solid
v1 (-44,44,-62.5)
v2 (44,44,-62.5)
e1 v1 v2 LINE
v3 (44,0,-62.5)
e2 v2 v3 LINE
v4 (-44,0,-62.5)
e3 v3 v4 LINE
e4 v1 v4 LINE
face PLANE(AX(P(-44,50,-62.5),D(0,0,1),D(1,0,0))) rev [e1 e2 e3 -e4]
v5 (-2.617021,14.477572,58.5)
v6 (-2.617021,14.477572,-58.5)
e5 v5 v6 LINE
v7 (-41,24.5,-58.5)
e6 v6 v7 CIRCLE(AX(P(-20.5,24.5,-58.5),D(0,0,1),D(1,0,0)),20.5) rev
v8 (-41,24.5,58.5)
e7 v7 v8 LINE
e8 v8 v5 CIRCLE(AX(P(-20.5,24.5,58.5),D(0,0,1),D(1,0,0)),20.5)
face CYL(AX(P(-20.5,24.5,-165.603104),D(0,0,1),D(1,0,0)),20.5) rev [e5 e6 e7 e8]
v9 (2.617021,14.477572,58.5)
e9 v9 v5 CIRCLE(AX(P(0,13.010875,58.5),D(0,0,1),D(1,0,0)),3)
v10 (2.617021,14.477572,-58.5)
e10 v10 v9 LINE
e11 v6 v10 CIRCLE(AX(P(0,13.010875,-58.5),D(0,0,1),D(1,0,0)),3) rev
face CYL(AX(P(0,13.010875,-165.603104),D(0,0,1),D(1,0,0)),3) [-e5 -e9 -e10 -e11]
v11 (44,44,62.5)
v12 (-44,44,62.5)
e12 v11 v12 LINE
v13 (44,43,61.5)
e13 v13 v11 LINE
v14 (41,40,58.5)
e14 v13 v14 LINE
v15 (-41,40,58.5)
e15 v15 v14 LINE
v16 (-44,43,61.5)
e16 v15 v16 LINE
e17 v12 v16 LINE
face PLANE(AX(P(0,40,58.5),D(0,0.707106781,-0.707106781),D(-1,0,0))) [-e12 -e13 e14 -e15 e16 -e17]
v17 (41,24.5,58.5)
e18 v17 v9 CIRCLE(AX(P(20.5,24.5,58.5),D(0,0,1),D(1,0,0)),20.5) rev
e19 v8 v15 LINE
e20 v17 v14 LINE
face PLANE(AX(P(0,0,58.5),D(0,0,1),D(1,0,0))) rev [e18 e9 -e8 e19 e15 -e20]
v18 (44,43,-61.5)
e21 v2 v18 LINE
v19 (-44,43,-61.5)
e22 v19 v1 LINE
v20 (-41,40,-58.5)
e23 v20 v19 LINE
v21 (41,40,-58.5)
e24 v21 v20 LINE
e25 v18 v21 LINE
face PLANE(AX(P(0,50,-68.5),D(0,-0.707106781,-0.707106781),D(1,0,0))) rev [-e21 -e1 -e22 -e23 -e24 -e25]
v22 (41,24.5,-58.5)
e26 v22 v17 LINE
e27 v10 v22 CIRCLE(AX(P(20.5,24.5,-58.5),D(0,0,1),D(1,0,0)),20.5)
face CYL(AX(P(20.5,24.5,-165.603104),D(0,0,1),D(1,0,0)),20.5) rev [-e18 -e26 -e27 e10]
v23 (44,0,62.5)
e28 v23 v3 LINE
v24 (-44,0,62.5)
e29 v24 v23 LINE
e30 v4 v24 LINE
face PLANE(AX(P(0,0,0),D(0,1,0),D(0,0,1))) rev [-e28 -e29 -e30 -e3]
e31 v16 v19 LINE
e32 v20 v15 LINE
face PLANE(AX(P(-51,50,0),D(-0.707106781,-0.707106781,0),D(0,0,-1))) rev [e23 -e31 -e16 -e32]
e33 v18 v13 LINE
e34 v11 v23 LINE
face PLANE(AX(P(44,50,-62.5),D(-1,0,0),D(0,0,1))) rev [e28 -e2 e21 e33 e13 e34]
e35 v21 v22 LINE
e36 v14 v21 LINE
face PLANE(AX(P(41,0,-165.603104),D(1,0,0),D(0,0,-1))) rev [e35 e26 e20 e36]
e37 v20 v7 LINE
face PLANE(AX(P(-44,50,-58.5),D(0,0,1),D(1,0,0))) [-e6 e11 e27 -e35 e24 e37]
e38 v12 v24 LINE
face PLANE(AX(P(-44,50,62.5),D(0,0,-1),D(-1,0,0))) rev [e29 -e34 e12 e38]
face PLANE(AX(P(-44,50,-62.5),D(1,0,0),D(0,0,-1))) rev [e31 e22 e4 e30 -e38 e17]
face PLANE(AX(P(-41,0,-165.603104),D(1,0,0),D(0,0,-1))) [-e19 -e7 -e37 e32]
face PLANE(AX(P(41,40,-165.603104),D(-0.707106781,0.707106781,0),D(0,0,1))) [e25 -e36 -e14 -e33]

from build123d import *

# Parameters (mm, degrees)
SKETCH1_W           = 88
SKETCH1_H           = 125
BOSS_EXTRUDE1_DEPTH = 50
CUT_EXTRUDE1_DEPTH  = 117
FILLET1_R           = 3


with BuildPart() as part:
    # Sketch1 → Boss-Extrude1 (new body)
    with BuildSketch(Plane(origin=(0, 0, 0), x_dir=(1, 0, 0), z_dir=(0, 1, 0))):
        Rectangle(SKETCH1_W, SKETCH1_H)
    extrude(amount=BOSS_EXTRUDE1_DEPTH)

    # Sketch2 → Cut-Extrude1 (cut)
    with BuildSketch(Plane.XY.offset(58.5)):
        with BuildLine():
            Line((-41, 24.5), (-41, 66.5))
            Line((-41, 66.5), (41, 66.5))
            Line((41, 66.5), (41, 24.5))
            ThreePointArc((41, 24.5), (20.5, 4), (0, 24.5))
            ThreePointArc((0, 24.5), (-20.5, 4), (-41, 24.5))
        make_face()
    extrude(amount=-CUT_EXTRUDE1_DEPTH, mode=Mode.SUBTRACT)

    # Fillet1
    fillet1_edges = [part.edges().sort_by_distance(p)[0] for p in [
        (0, 24.5, 0),
    ]]
    fillet(fillet1_edges, radius=FILLET1_R)

    # Chamfer1
    # the kernel refuses this chamfer: 10 mm, written as the material it takes off along each edge
    with BuildSketch(Plane(origin=(-41, 50, 58.5), x_dir=(0, 0.027495876610586337, 0.9996219169112968), z_dir=(1, 0, 0)), Plane(origin=(-41, 50, -58.5), x_dir=(0, -0.9996219169112968, 0.027495876610586317), z_dir=(1, 0, 0))) as chamfer1_piece_1:
        with BuildLine():
            Line((10.286731952, 0), (-0.565471549, 10.271177935))
            Line((-0.565471549, 10.271177935), (-0.765395932, 10.26567876))
            ThreePointArc((-0.765395932, 10.26567876), (-0.341292271, 5.133978296), (-0.199924383, -0.005499175))
            Line((-0.199924383, -0.005499175), (0.005499175, -0.199924383))
            ThreePointArc((0.005499175, -0.199924383), (5.144976647, -0.058556496), (10.292231127, -0.199924383))
            Line((10.292231127, -0.199924383), (10.286731952, 0))
        make_face()
    extrude(amount=82, mode=Mode.SUBTRACT)
    with BuildSketch(Plane(origin=(41, 50, 58.5), x_dir=(0.9996219169112968, 0.027495876610586317, 0), z_dir=(0, 0, -1))) as chamfer1_piece_2:
        with BuildLine():
            Line((10.286731952, 0), (-0.565471549, 10.271177935))
            Line((-0.565471549, 10.271177935), (-0.765395932, 10.26567876))
            ThreePointArc((-0.765395932, 10.26567876), (-0.341292271, 5.133978296), (-0.199924383, -0.005499175))
            Line((-0.199924383, -0.005499175), (0.005499175, -0.199924383))
            ThreePointArc((0.005499175, -0.199924383), (5.144976647, -0.058556496), (10.292231127, -0.199924383))
            Line((10.292231127, -0.199924383), (10.286731952, 0))
        make_face()
    extrude(amount=117, mode=Mode.SUBTRACT)
    with BuildSketch(Plane(origin=(-41, 50, -58.5), x_dir=(0.027495876610586317, -0.9996219169112968, 0), z_dir=(0, 0, 1))) as chamfer1_piece_3:
        with BuildLine():
            Line((10.286731952, 0), (-0.565471549, -10.271177935))
            Line((-0.565471549, -10.271177935), (-0.765395932, -10.26567876))
            ThreePointArc((-0.765395932, -10.26567876), (-0.341292271, -5.133978296), (-0.199924383, 0.005499175))
            Line((-0.199924383, 0.005499175), (0.005499175, 0.199924383))
            ThreePointArc((0.005499175, 0.199924383), (5.144976647, 0.058556496), (10.292231127, 0.199924383))
            Line((10.292231127, 0.199924383), (10.286731952, 0))
        make_face()
    extrude(amount=117, mode=Mode.SUBTRACT)
    with BuildSketch(Plane(origin=(-41, 50, -58.5), x_dir=(0.027495876610586317, -0.9996219169112968, 0), z_dir=(0, 0, 1))) as chamfer1_piece_4a_section:
        with BuildLine():
            Line((10.286731952, 0), (-0.565471549, -10.271177935))
            Line((-0.565471549, -10.271177935), (-0.765395932, -10.26567876))
            ThreePointArc((-0.765395932, -10.26567876), (-0.341292271, -5.133978296), (-0.199924383, 0.005499175))
            Line((-0.199924383, 0.005499175), (0.005499175, 0.199924383))
            ThreePointArc((0.005499175, 0.199924383), (5.144976647, 0.058556496), (10.292231127, 0.199924383))
            Line((10.292231127, 0.199924383), (10.286731952, 0))
        make_face()
    chamfer1_piece_4a = extrude(amount=142.71682988, mode=Mode.PRIVATE)
    chamfer1_piece_4a = split(chamfer1_piece_4a, bisect_by=Plane(origin=(-44.297936268, 46.702063732, 58.5), z_dir=(0, 0, 1)), keep=Keep.TOP, mode=Mode.PRIVATE)
    with BuildSketch(Plane(origin=(-66.71682988, 50, 58.5), x_dir=(0, 0.027495876610586337, 0.9996219169112968), z_dir=(1, 0, 0))) as chamfer1_piece_4b_section:
        with BuildLine():
            Line((10.286731952, 0), (-0.565471549, 10.271177935))
            Line((-0.565471549, 10.271177935), (-0.765395932, 10.26567876))
            ThreePointArc((-0.765395932, 10.26567876), (-0.341292271, 5.133978296), (-0.199924383, -0.005499175))
            Line((-0.199924383, -0.005499175), (0.005499175, -0.199924383))
            ThreePointArc((0.005499175, -0.199924383), (5.144976647, -0.058556496), (10.292231127, -0.199924383))
            Line((10.292231127, -0.199924383), (10.286731952, 0))
        make_face()
    chamfer1_piece_4b = extrude(amount=107.71682988, mode=Mode.PRIVATE)
    chamfer1_piece_4b = split(chamfer1_piece_4b, bisect_by=Plane(origin=(-41, 46.702063732, 61.797936268), z_dir=(-1, 0, 0)), keep=Keep.TOP, mode=Mode.PRIVATE)
    chamfer1_piece_4 = chamfer1_piece_4a & chamfer1_piece_4b
    add(chamfer1_piece_4, mode=Mode.SUBTRACT)
    with BuildSketch(Plane(origin=(41, 50, 84.21682988), x_dir=(0.9996219169112968, 0.027495876610586317, 0), z_dir=(0, 0, -1))) as chamfer1_piece_5a_section:
        with BuildLine():
            Line((10.286731952, 0), (-0.565471549, 10.271177935))
            Line((-0.565471549, 10.271177935), (-0.765395932, 10.26567876))
            ThreePointArc((-0.765395932, 10.26567876), (-0.341292271, 5.133978296), (-0.199924383, -0.005499175))
            Line((-0.199924383, -0.005499175), (0.005499175, -0.199924383))
            ThreePointArc((0.005499175, -0.199924383), (5.144976647, -0.058556496), (10.292231127, -0.199924383))
            Line((10.292231127, -0.199924383), (10.286731952, 0))
        make_face()
    chamfer1_piece_5a = extrude(amount=142.71682988, mode=Mode.PRIVATE)
    chamfer1_piece_5a = split(chamfer1_piece_5a, bisect_by=Plane(origin=(44.297936268, 46.702063732, 58.5), z_dir=(0, 0, 1)), keep=Keep.TOP, mode=Mode.PRIVATE)
    with BuildSketch(Plane(origin=(-41, 50, 58.5), x_dir=(0, 0.027495876610586337, 0.9996219169112968), z_dir=(1, 0, 0))) as chamfer1_piece_5b_section:
        with BuildLine():
            Line((10.286731952, 0), (-0.565471549, 10.271177935))
            Line((-0.565471549, 10.271177935), (-0.765395932, 10.26567876))
            ThreePointArc((-0.765395932, 10.26567876), (-0.341292271, 5.133978296), (-0.199924383, -0.005499175))
            Line((-0.199924383, -0.005499175), (0.005499175, -0.199924383))
            ThreePointArc((0.005499175, -0.199924383), (5.144976647, -0.058556496), (10.292231127, -0.199924383))
            Line((10.292231127, -0.199924383), (10.286731952, 0))
        make_face()
    chamfer1_piece_5b = extrude(amount=107.71682988, mode=Mode.PRIVATE)
    chamfer1_piece_5b = split(chamfer1_piece_5b, bisect_by=Plane(origin=(41, 46.702063732, 61.797936268), z_dir=(1, 0, 0)), keep=Keep.TOP, mode=Mode.PRIVATE)
    chamfer1_piece_5 = chamfer1_piece_5a & chamfer1_piece_5b
    add(chamfer1_piece_5, mode=Mode.SUBTRACT)
    with BuildSketch(Plane(origin=(-41, 50, -58.5), x_dir=(0, -0.9996219169112968, 0.027495876610586317), z_dir=(1, 0, 0))) as chamfer1_piece_6a_section:
        with BuildLine():
            Line((10.286731952, 0), (-0.565471549, 10.271177935))
            Line((-0.565471549, 10.271177935), (-0.765395932, 10.26567876))
            ThreePointArc((-0.765395932, 10.26567876), (-0.341292271, 5.133978296), (-0.199924383, -0.005499175))
            Line((-0.199924383, -0.005499175), (0.005499175, -0.199924383))
            ThreePointArc((0.005499175, -0.199924383), (5.144976647, -0.058556496), (10.292231127, -0.199924383))
            Line((10.292231127, -0.199924383), (10.286731952, 0))
        make_face()
    chamfer1_piece_6a = extrude(amount=107.71682988, mode=Mode.PRIVATE)
    chamfer1_piece_6a = split(chamfer1_piece_6a, bisect_by=Plane(origin=(41, 46.702063732, -61.797936268), z_dir=(1, 0, 0)), keep=Keep.TOP, mode=Mode.PRIVATE)
    with BuildSketch(Plane(origin=(41, 50, 58.5), x_dir=(0.9996219169112968, 0.027495876610586317, 0), z_dir=(0, 0, -1))) as chamfer1_piece_6b_section:
        with BuildLine():
            Line((10.286731952, 0), (-0.565471549, 10.271177935))
            Line((-0.565471549, 10.271177935), (-0.765395932, 10.26567876))
            ThreePointArc((-0.765395932, 10.26567876), (-0.341292271, 5.133978296), (-0.199924383, -0.005499175))
            Line((-0.199924383, -0.005499175), (0.005499175, -0.199924383))
            ThreePointArc((0.005499175, -0.199924383), (5.144976647, -0.058556496), (10.292231127, -0.199924383))
            Line((10.292231127, -0.199924383), (10.286731952, 0))
        make_face()
    chamfer1_piece_6b = extrude(amount=142.71682988, mode=Mode.PRIVATE)
    chamfer1_piece_6b = split(chamfer1_piece_6b, bisect_by=Plane(origin=(44.297936268, 46.702063732, -58.5), z_dir=(0, 0, -1)), keep=Keep.TOP, mode=Mode.PRIVATE)
    chamfer1_piece_6 = chamfer1_piece_6a & chamfer1_piece_6b
    add(chamfer1_piece_6, mode=Mode.SUBTRACT)
    with BuildSketch(Plane(origin=(-66.71682988, 50, -58.5), x_dir=(0, -0.9996219169112968, 0.027495876610586317), z_dir=(1, 0, 0))) as chamfer1_piece_7a_section:
        with BuildLine():
            Line((10.286731952, 0), (-0.565471549, 10.271177935))
            Line((-0.565471549, 10.271177935), (-0.765395932, 10.26567876))
            ThreePointArc((-0.765395932, 10.26567876), (-0.341292271, 5.133978296), (-0.199924383, -0.005499175))
            Line((-0.199924383, -0.005499175), (0.005499175, -0.199924383))
            ThreePointArc((0.005499175, -0.199924383), (5.144976647, -0.058556496), (10.292231127, -0.199924383))
            Line((10.292231127, -0.199924383), (10.286731952, 0))
        make_face()
    chamfer1_piece_7a = extrude(amount=107.71682988, mode=Mode.PRIVATE)
    chamfer1_piece_7a = split(chamfer1_piece_7a, bisect_by=Plane(origin=(-41, 46.702063732, -61.797936268), z_dir=(-1, 0, 0)), keep=Keep.TOP, mode=Mode.PRIVATE)
    with BuildSketch(Plane(origin=(-41, 50, -84.21682988), x_dir=(0.027495876610586317, -0.9996219169112968, 0), z_dir=(0, 0, 1))) as chamfer1_piece_7b_section:
        with BuildLine():
            Line((10.286731952, 0), (-0.565471549, -10.271177935))
            Line((-0.565471549, -10.271177935), (-0.765395932, -10.26567876))
            ThreePointArc((-0.765395932, -10.26567876), (-0.341292271, -5.133978296), (-0.199924383, 0.005499175))
            Line((-0.199924383, 0.005499175), (0.005499175, 0.199924383))
            ThreePointArc((0.005499175, 0.199924383), (5.144976647, 0.058556496), (10.292231127, 0.199924383))
            Line((10.292231127, 0.199924383), (10.286731952, 0))
        make_face()
    chamfer1_piece_7b = extrude(amount=142.71682988, mode=Mode.PRIVATE)
    chamfer1_piece_7b = split(chamfer1_piece_7b, bisect_by=Plane(origin=(-44.297936268, 46.702063732, -58.5), z_dir=(0, 0, -1)), keep=Keep.TOP, mode=Mode.PRIVATE)
    chamfer1_piece_7 = chamfer1_piece_7a & chamfer1_piece_7b
    add(chamfer1_piece_7, mode=Mode.SUBTRACT)


solid = part.part
